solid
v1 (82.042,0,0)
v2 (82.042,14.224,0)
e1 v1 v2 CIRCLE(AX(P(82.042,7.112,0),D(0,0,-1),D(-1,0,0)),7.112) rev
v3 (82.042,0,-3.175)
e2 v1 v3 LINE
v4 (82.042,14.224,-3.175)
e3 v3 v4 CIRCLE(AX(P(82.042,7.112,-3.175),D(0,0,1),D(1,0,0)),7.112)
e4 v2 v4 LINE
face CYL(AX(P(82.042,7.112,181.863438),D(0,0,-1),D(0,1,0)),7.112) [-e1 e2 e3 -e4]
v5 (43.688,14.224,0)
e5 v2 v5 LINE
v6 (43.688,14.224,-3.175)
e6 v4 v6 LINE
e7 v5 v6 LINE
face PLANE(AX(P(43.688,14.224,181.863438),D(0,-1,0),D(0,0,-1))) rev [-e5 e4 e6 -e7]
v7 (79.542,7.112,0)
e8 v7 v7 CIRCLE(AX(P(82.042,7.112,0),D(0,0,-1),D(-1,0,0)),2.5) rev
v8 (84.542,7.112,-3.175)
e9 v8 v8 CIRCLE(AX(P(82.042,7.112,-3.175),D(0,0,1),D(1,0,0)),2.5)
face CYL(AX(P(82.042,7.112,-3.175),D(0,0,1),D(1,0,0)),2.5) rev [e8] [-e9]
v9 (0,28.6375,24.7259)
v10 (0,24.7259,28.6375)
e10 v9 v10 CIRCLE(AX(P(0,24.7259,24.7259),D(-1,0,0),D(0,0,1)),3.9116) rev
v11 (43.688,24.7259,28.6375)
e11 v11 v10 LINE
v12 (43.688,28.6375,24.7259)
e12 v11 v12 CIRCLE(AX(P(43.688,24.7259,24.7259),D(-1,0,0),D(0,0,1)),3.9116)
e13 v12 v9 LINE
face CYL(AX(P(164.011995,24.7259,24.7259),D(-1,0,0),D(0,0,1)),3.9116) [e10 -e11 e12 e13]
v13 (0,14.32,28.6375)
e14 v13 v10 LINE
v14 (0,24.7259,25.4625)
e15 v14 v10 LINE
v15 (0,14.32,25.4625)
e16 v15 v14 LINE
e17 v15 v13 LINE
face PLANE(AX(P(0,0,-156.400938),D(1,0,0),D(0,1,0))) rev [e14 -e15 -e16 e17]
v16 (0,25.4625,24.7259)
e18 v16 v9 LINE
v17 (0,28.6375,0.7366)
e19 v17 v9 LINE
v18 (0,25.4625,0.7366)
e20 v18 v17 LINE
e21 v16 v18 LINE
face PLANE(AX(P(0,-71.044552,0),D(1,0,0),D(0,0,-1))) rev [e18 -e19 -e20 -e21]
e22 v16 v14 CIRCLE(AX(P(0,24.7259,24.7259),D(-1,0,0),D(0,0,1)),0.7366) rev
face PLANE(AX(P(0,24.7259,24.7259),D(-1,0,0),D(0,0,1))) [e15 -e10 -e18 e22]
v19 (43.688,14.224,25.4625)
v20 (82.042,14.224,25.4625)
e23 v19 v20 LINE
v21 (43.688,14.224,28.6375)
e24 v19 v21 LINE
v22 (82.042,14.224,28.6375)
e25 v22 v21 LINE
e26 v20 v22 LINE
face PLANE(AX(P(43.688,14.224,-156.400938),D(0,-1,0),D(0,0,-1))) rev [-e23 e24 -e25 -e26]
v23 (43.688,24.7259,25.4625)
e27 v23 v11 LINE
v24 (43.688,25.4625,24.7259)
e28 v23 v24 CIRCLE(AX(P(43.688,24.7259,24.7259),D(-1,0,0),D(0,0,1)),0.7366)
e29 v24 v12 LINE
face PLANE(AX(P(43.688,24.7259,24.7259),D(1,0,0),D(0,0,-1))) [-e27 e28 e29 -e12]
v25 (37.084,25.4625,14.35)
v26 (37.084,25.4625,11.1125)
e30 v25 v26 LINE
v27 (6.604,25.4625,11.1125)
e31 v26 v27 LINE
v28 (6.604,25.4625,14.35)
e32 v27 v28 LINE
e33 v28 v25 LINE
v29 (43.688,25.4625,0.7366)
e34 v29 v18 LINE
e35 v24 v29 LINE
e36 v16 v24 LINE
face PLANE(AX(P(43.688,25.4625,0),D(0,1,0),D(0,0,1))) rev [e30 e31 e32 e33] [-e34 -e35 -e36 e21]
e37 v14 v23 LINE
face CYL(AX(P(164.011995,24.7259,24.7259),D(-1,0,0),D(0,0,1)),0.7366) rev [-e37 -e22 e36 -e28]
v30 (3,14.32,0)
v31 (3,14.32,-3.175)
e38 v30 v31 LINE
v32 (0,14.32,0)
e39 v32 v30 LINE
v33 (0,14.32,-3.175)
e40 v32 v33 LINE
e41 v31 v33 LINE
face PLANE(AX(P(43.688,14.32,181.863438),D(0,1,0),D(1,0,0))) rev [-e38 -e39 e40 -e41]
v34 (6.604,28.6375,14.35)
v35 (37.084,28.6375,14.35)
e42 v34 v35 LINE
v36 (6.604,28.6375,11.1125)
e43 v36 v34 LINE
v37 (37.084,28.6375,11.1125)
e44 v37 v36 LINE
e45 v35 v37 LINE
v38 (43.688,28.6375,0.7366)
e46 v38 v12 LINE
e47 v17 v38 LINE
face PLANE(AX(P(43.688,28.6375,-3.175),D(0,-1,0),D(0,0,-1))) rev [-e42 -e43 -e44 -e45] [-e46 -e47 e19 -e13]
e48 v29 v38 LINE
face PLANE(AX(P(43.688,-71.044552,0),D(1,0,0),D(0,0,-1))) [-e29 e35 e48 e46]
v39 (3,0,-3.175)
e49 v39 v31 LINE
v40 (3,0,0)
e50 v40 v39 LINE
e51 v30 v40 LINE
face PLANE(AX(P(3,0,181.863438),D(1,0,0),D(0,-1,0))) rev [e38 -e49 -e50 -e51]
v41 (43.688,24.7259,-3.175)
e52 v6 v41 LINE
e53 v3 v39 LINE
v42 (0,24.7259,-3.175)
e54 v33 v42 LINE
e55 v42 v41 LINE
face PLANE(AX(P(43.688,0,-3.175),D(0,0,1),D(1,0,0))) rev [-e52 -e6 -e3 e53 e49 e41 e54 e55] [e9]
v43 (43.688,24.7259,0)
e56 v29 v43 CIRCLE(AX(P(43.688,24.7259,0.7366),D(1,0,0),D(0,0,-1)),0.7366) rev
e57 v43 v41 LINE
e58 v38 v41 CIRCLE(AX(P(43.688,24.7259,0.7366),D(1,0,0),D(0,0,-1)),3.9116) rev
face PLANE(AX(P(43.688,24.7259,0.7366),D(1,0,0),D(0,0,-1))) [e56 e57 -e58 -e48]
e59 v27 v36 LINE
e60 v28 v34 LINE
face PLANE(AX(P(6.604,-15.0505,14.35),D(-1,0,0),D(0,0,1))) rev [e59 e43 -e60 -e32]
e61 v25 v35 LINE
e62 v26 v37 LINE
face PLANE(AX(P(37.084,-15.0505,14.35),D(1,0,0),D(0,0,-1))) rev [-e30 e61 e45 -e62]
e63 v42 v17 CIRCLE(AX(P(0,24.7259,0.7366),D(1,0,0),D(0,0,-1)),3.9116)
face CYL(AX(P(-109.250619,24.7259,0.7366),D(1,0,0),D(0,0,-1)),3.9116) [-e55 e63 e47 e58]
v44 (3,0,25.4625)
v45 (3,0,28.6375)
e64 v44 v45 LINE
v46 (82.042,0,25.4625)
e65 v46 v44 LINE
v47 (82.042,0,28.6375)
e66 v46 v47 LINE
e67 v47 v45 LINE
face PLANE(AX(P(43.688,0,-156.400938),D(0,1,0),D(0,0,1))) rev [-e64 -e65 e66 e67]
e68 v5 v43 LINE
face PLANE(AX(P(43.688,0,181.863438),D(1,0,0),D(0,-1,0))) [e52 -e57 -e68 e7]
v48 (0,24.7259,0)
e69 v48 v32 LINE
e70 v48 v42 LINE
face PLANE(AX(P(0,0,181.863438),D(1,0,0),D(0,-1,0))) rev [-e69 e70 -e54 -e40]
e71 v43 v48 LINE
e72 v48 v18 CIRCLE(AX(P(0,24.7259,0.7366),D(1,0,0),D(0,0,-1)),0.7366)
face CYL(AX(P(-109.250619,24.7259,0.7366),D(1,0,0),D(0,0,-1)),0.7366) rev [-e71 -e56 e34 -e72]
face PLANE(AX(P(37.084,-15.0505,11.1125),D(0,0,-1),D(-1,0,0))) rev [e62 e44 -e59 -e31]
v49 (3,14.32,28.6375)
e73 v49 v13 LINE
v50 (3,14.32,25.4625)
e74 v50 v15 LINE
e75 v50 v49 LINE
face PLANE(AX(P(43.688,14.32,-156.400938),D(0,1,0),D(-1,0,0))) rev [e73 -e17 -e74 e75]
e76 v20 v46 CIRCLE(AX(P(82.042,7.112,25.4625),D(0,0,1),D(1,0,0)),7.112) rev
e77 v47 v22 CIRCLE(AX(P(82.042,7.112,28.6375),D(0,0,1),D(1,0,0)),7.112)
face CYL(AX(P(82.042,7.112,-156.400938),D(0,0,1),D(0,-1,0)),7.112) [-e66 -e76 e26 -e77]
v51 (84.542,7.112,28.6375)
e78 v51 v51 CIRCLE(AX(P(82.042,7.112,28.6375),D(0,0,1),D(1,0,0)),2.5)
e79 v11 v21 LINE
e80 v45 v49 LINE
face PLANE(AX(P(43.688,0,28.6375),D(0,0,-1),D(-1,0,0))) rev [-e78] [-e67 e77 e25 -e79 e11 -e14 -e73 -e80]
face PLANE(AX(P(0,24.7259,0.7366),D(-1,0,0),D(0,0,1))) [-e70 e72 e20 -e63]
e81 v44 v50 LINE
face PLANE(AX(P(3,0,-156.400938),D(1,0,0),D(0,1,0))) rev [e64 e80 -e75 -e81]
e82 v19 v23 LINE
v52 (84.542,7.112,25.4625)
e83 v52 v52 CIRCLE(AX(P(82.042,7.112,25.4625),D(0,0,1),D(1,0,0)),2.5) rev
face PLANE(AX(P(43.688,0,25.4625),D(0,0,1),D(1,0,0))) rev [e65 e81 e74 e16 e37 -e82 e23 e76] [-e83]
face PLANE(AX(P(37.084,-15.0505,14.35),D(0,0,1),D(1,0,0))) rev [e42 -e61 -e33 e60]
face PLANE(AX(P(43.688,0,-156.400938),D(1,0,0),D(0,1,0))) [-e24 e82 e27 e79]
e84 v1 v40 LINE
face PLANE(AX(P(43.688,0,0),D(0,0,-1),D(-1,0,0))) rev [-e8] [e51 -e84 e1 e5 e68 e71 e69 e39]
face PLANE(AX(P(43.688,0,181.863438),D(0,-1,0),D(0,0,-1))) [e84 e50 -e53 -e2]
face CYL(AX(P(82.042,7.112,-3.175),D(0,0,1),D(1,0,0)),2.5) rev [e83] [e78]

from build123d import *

# Parameters (mm, degrees)
SALIENTE_EXTRUIR1_DEPTH         = 43.688
CROQUIS2_W                      = 3
CROQUIS2_H                      = 14.32
CORTAR_EXTRUIR1_DEPTH           = 43.688
CROQUIS3_W                      = 30.48
CROQUIS3_H                      = 3.2375
CORTAR_EXTRUIR2_DEPTH           = 43.688
CROQUIS4_R                      = 2.5
SALIENTE_EXTRUIR2_DEPTH         = 31.8125
CROQUIS5_W                      = 45.466
CROQUIS5_H                      = 25.4625
CORTAR_EXTRUIR3_DEPTH           = 43.688
DESPLEGAR_PLIEGUES5_OUTLINE_W   = 91
DESPLEGAR_PLIEGUES5_OUTLINE_H   = 3.175
DESPLEGAR_PLIEGUES5_DEPTH       = 25.4625
DESPLEGAR_START                 = 25.4625
DESPLEGAR_PLIEGUES5_2_OUTLINE_R = 2.5
DESPLEGAR_PLIEGUES5_2_DEPTH     = 3.175
PROCESAR_START                  = -27.639987743
PROCESAR_PLIEGUES5_OUTLINE_W    = 43.688
PROCESAR_PLIEGUES5_OUTLINE_H    = 3.175
PROCESAR_PLIEGUES5_DEPTH        = 24.464987743
PROCESAR_START_2                = 28.6375
PROCESAR_PLIEGUES5_2_OUTLINE_W  = 43.688
PROCESAR_PLIEGUES5_2_OUTLINE_H  = 3.175
PROCESAR_PLIEGUES5_2_DEPTH      = 24.464987743
PROCESAR_START_3                = -3.175
PROCESAR_PLIEGUES5_3_OUTLINE_R  = 2.5
PROCESAR_PLIEGUES5_3_DEPTH      = 3.9116
PROCESAR_START_4                = 24.7259
PROCESAR_PLIEGUES5_4_OUTLINE_R  = 2.5
PROCESAR_PLIEGUES5_4_DEPTH      = 3.9116
PROCESAR_PLIEGUES5_5_OUTLINE_W  = 3.175
PROCESAR_PLIEGUES5_5_OUTLINE_H  = 14.224
PROCESAR_PLIEGUES5_5_DEPTH      = 90


with BuildPart() as part:
    # Croquis1 → Saliente-Extruir1 (new body)
    with BuildSketch(Plane(origin=(0, 0, 0), x_dir=(0, 0, -1), z_dir=(1, 0, 0))):
        Polygon((-28.6375, 0), (-28.6375, 28.6375), (3.175, 28.6375), (3.175, 0), (0, 0), (0, 25.4625), (-25.4625, 25.4625), (-25.4625, 0), align=None)
    extrude(amount=SALIENTE_EXTRUIR1_DEPTH)

    # Croquis2 → Cortar-Extruir1 (cut)
    with BuildSketch(Plane.XY.offset(28.6375)):
        with Locations((1.5, 7.16)):
            Rectangle(CROQUIS2_W, CROQUIS2_H)
    extrude(amount=-CORTAR_EXTRUIR1_DEPTH, mode=Mode.SUBTRACT)

    # Croquis3 → Cortar-Extruir2 (cut)
    with BuildSketch(Plane(origin=(0, 28.6375, 0), x_dir=(1, 0, 0), z_dir=(0, 1, 0))):
        with Locations((21.844, -12.73125)):
            Rectangle(CROQUIS3_W, CROQUIS3_H)
    extrude(amount=-CORTAR_EXTRUIR2_DEPTH, mode=Mode.SUBTRACT)

    # Croquis4 → Saliente-Extruir2 (add)
    with BuildSketch(Plane.XY.offset(28.6375)):
        with BuildLine():
            Line((43.688, 14.224), (82.042, 14.224))
            ThreePointArc((82.042, 14.224), (89.154, 7.112), (82.042, 0))
            Line((82.042, 0), (43.688, 0))
            Line((43.688, 0), (43.688, 14.224))
        make_face()
        with Locations((82.042, 7.112)):
            Circle(CROQUIS4_R, mode=Mode.SUBTRACT)
    extrude(amount=-SALIENTE_EXTRUIR2_DEPTH)

    # Croquis5 → Cortar-Extruir3 (cut)
    with BuildSketch(Plane(origin=(0, 14.224, 0), x_dir=(1, 0, 0), z_dir=(0, 1, 0))):
        with Locations((66.421, -12.73125)):
            Rectangle(CROQUIS5_W, CROQUIS5_H)
    extrude(amount=-CORTAR_EXTRUIR3_DEPTH, mode=Mode.SUBTRACT)

    # Desplegar pliegues5: read off the stored shape, not the designer's step
    # Desplegar pliegues5 outline → Desplegar pliegues5 (cut)
    with BuildSketch(Plane(origin=(0, 0, 0), x_dir=(1, 0, 0), z_dir=(0, 1, 0))):
        with Locations((45.5, -27.05)):
            Rectangle(DESPLEGAR_PLIEGUES5_OUTLINE_W, DESPLEGAR_PLIEGUES5_OUTLINE_H)
        with Locations((45.5, 1.5875)):
            Rectangle(DESPLEGAR_PLIEGUES5_OUTLINE_W, DESPLEGAR_PLIEGUES5_OUTLINE_H)
    extrude(amount=DESPLEGAR_PLIEGUES5_DEPTH, mode=Mode.SUBTRACT)

    # Desplegar pliegues5 2 outline → Desplegar pliegues5 2 (add)
    # profile 1 of 2: a face of its own
    with BuildSketch(Plane(origin=(0, 0, 0), x_dir=(1, 0, 0), z_dir=(0, 1, 0)).offset(DESPLEGAR_START)):
        with BuildLine():
            Line((0, -28.6375), (0, -38.782487743))
            Line((0, -38.782487743), (3, -38.782487743))
            Line((3, -38.782487743), (3, -53.102487743))
            Line((3, -53.102487743), (82.042, -53.102487743))
            ThreePointArc((82.042, -53.102487743), (89.154, -45.990487743), (82.042, -38.878487743))
            Line((82.042, -38.878487743), (43.688, -38.878487743))
            Line((43.688, -38.878487743), (43.688, -28.6375))
            Line((43.688, -28.6375), (0, -28.6375))
        make_face()
        with Locations((82.042, -45.990487743)):
            Circle(DESPLEGAR_PLIEGUES5_2_OUTLINE_R, mode=Mode.SUBTRACT)
    # profile 2 of 2: a face of its own
    with BuildSketch(Plane(origin=(0, 0, 0), x_dir=(1, 0, 0), z_dir=(0, 1, 0)).offset(DESPLEGAR_START)):
        with BuildLine():
            Line((3, 27.639987743), (3, 13.319987743))
            Line((3, 13.319987743), (0, 13.319987743))
            Line((0, 13.319987743), (0, 3.175))
            Line((0, 3.175), (43.688, 3.175))
            Line((43.688, 3.175), (43.688, 13.415987743))
            Line((43.688, 13.415987743), (82.042, 13.415987743))
            ThreePointArc((82.042, 13.415987743), (89.154, 20.527987743), (82.042, 27.639987743))
            Line((82.042, 27.639987743), (3, 27.639987743))
        make_face()
        with Locations((82.042, 20.527987743)):
            Circle(DESPLEGAR_PLIEGUES5_2_OUTLINE_R, mode=Mode.SUBTRACT)
    extrude(amount=DESPLEGAR_PLIEGUES5_2_DEPTH)

    # Procesar pliegues5: read off the stored shape, not the designer's step
    # Procesar pliegues5 outline → Procesar pliegues5 (cut)
    with BuildSketch(Plane.XY.offset(PROCESAR_START)):
        with Locations((21.844, 27.05)):
            Rectangle(PROCESAR_PLIEGUES5_OUTLINE_W, PROCESAR_PLIEGUES5_OUTLINE_H)
    extrude(amount=PROCESAR_PLIEGUES5_DEPTH, mode=Mode.SUBTRACT)

    # Procesar pliegues5 2 outline → Procesar pliegues5 2 (cut)
    with BuildSketch(Plane.XY.offset(PROCESAR_START_2)):
        with Locations((21.844, 27.05)):
            Rectangle(PROCESAR_PLIEGUES5_2_OUTLINE_W, PROCESAR_PLIEGUES5_2_OUTLINE_H)
    extrude(amount=PROCESAR_PLIEGUES5_2_DEPTH, mode=Mode.SUBTRACT)

    # Procesar pliegues5 3 outline → Procesar pliegues5 3 (add)
    with BuildSketch(Plane.XY.offset(PROCESAR_START_3)):
        with BuildLine():
            Line((3, 14.32), (3, 0))
            Line((3, 0), (82.042, 0))
            ThreePointArc((82.042, 0), (89.154, 7.112), (82.042, 14.224))
            Line((82.042, 14.224), (43.688, 14.224))
            Line((43.688, 14.224), (43.688, 25.4625))
            Line((43.688, 25.4625), (0, 25.4625))
            Line((0, 25.4625), (0, 14.32))
            Line((0, 14.32), (3, 14.32))
        make_face()
        with Locations((82.042, 7.112)):
            Circle(PROCESAR_PLIEGUES5_3_OUTLINE_R, mode=Mode.SUBTRACT)
    extrude(amount=PROCESAR_PLIEGUES5_3_DEPTH)

    # Procesar pliegues5 4 outline → Procesar pliegues5 4 (add)
    with BuildSketch(Plane.XY.offset(PROCESAR_START_4)):
        with BuildLine():
            Line((3, 14.32), (3, 0))
            Line((3, 0), (82.042, 0))
            ThreePointArc((82.042, 0), (89.154, 7.112), (82.042, 14.224))
            Line((82.042, 14.224), (43.688, 14.224))
            Line((43.688, 14.224), (43.688, 25.4625))
            Line((43.688, 25.4625), (0, 25.4625))
            Line((0, 25.4625), (0, 14.32))
            Line((0, 14.32), (3, 14.32))
        make_face()
        with Locations((82.042, 7.112)):
            Circle(PROCESAR_PLIEGUES5_4_OUTLINE_R, mode=Mode.SUBTRACT)
    extrude(amount=PROCESAR_PLIEGUES5_4_DEPTH)

    # Procesar pliegues5 5 outline → Procesar pliegues5 5 (cut)
    with BuildSketch(Plane.YZ):
        with BuildLine():
            Line((0, 0.7366), (0, 0))
            Line((0, 0), (24.7259, 0))
            ThreePointArc((24.7259, 0), (25.246754855, 0.215745145), (25.4625, 0.7366))
            Line((25.4625, 0.7366), (0, 0.7366))
        make_face()
        with BuildLine():
            ThreePointArc((24.7259, 28.6375), (27.491818885, 27.491818885), (28.6375, 24.7259))
            Line((28.6375, 24.7259), (28.6375, 28.6375))
            Line((28.6375, 28.6375), (24.7259, 28.6375))
        make_face()
        with BuildLine():
            ThreePointArc((28.6375, 0.7366), (27.491818885, -2.029318885), (24.7259, -3.175))
            Line((24.7259, -3.175), (28.6375, -3.175))
            Line((28.6375, -3.175), (28.6375, 0.7366))
        make_face()
        with BuildLine():
            ThreePointArc((25.4625, 24.7259), (25.246754855, 25.246754855), (24.7259, 25.4625))
            Line((24.7259, 25.4625), (0, 25.4625))
            Line((0, 25.4625), (0, 24.7259))
            Line((0, 24.7259), (25.4625, 24.7259))
        make_face()
        with Locations((27.05, 45.990487743)):
            Rectangle(PROCESAR_PLIEGUES5_5_OUTLINE_W, PROCESAR_PLIEGUES5_5_OUTLINE_H)
        with Locations((27.05, -20.527987743)):
            Rectangle(PROCESAR_PLIEGUES5_5_OUTLINE_W, PROCESAR_PLIEGUES5_5_OUTLINE_H)
    extrude(amount=PROCESAR_PLIEGUES5_5_DEPTH, mode=Mode.SUBTRACT)


solid = part.part
